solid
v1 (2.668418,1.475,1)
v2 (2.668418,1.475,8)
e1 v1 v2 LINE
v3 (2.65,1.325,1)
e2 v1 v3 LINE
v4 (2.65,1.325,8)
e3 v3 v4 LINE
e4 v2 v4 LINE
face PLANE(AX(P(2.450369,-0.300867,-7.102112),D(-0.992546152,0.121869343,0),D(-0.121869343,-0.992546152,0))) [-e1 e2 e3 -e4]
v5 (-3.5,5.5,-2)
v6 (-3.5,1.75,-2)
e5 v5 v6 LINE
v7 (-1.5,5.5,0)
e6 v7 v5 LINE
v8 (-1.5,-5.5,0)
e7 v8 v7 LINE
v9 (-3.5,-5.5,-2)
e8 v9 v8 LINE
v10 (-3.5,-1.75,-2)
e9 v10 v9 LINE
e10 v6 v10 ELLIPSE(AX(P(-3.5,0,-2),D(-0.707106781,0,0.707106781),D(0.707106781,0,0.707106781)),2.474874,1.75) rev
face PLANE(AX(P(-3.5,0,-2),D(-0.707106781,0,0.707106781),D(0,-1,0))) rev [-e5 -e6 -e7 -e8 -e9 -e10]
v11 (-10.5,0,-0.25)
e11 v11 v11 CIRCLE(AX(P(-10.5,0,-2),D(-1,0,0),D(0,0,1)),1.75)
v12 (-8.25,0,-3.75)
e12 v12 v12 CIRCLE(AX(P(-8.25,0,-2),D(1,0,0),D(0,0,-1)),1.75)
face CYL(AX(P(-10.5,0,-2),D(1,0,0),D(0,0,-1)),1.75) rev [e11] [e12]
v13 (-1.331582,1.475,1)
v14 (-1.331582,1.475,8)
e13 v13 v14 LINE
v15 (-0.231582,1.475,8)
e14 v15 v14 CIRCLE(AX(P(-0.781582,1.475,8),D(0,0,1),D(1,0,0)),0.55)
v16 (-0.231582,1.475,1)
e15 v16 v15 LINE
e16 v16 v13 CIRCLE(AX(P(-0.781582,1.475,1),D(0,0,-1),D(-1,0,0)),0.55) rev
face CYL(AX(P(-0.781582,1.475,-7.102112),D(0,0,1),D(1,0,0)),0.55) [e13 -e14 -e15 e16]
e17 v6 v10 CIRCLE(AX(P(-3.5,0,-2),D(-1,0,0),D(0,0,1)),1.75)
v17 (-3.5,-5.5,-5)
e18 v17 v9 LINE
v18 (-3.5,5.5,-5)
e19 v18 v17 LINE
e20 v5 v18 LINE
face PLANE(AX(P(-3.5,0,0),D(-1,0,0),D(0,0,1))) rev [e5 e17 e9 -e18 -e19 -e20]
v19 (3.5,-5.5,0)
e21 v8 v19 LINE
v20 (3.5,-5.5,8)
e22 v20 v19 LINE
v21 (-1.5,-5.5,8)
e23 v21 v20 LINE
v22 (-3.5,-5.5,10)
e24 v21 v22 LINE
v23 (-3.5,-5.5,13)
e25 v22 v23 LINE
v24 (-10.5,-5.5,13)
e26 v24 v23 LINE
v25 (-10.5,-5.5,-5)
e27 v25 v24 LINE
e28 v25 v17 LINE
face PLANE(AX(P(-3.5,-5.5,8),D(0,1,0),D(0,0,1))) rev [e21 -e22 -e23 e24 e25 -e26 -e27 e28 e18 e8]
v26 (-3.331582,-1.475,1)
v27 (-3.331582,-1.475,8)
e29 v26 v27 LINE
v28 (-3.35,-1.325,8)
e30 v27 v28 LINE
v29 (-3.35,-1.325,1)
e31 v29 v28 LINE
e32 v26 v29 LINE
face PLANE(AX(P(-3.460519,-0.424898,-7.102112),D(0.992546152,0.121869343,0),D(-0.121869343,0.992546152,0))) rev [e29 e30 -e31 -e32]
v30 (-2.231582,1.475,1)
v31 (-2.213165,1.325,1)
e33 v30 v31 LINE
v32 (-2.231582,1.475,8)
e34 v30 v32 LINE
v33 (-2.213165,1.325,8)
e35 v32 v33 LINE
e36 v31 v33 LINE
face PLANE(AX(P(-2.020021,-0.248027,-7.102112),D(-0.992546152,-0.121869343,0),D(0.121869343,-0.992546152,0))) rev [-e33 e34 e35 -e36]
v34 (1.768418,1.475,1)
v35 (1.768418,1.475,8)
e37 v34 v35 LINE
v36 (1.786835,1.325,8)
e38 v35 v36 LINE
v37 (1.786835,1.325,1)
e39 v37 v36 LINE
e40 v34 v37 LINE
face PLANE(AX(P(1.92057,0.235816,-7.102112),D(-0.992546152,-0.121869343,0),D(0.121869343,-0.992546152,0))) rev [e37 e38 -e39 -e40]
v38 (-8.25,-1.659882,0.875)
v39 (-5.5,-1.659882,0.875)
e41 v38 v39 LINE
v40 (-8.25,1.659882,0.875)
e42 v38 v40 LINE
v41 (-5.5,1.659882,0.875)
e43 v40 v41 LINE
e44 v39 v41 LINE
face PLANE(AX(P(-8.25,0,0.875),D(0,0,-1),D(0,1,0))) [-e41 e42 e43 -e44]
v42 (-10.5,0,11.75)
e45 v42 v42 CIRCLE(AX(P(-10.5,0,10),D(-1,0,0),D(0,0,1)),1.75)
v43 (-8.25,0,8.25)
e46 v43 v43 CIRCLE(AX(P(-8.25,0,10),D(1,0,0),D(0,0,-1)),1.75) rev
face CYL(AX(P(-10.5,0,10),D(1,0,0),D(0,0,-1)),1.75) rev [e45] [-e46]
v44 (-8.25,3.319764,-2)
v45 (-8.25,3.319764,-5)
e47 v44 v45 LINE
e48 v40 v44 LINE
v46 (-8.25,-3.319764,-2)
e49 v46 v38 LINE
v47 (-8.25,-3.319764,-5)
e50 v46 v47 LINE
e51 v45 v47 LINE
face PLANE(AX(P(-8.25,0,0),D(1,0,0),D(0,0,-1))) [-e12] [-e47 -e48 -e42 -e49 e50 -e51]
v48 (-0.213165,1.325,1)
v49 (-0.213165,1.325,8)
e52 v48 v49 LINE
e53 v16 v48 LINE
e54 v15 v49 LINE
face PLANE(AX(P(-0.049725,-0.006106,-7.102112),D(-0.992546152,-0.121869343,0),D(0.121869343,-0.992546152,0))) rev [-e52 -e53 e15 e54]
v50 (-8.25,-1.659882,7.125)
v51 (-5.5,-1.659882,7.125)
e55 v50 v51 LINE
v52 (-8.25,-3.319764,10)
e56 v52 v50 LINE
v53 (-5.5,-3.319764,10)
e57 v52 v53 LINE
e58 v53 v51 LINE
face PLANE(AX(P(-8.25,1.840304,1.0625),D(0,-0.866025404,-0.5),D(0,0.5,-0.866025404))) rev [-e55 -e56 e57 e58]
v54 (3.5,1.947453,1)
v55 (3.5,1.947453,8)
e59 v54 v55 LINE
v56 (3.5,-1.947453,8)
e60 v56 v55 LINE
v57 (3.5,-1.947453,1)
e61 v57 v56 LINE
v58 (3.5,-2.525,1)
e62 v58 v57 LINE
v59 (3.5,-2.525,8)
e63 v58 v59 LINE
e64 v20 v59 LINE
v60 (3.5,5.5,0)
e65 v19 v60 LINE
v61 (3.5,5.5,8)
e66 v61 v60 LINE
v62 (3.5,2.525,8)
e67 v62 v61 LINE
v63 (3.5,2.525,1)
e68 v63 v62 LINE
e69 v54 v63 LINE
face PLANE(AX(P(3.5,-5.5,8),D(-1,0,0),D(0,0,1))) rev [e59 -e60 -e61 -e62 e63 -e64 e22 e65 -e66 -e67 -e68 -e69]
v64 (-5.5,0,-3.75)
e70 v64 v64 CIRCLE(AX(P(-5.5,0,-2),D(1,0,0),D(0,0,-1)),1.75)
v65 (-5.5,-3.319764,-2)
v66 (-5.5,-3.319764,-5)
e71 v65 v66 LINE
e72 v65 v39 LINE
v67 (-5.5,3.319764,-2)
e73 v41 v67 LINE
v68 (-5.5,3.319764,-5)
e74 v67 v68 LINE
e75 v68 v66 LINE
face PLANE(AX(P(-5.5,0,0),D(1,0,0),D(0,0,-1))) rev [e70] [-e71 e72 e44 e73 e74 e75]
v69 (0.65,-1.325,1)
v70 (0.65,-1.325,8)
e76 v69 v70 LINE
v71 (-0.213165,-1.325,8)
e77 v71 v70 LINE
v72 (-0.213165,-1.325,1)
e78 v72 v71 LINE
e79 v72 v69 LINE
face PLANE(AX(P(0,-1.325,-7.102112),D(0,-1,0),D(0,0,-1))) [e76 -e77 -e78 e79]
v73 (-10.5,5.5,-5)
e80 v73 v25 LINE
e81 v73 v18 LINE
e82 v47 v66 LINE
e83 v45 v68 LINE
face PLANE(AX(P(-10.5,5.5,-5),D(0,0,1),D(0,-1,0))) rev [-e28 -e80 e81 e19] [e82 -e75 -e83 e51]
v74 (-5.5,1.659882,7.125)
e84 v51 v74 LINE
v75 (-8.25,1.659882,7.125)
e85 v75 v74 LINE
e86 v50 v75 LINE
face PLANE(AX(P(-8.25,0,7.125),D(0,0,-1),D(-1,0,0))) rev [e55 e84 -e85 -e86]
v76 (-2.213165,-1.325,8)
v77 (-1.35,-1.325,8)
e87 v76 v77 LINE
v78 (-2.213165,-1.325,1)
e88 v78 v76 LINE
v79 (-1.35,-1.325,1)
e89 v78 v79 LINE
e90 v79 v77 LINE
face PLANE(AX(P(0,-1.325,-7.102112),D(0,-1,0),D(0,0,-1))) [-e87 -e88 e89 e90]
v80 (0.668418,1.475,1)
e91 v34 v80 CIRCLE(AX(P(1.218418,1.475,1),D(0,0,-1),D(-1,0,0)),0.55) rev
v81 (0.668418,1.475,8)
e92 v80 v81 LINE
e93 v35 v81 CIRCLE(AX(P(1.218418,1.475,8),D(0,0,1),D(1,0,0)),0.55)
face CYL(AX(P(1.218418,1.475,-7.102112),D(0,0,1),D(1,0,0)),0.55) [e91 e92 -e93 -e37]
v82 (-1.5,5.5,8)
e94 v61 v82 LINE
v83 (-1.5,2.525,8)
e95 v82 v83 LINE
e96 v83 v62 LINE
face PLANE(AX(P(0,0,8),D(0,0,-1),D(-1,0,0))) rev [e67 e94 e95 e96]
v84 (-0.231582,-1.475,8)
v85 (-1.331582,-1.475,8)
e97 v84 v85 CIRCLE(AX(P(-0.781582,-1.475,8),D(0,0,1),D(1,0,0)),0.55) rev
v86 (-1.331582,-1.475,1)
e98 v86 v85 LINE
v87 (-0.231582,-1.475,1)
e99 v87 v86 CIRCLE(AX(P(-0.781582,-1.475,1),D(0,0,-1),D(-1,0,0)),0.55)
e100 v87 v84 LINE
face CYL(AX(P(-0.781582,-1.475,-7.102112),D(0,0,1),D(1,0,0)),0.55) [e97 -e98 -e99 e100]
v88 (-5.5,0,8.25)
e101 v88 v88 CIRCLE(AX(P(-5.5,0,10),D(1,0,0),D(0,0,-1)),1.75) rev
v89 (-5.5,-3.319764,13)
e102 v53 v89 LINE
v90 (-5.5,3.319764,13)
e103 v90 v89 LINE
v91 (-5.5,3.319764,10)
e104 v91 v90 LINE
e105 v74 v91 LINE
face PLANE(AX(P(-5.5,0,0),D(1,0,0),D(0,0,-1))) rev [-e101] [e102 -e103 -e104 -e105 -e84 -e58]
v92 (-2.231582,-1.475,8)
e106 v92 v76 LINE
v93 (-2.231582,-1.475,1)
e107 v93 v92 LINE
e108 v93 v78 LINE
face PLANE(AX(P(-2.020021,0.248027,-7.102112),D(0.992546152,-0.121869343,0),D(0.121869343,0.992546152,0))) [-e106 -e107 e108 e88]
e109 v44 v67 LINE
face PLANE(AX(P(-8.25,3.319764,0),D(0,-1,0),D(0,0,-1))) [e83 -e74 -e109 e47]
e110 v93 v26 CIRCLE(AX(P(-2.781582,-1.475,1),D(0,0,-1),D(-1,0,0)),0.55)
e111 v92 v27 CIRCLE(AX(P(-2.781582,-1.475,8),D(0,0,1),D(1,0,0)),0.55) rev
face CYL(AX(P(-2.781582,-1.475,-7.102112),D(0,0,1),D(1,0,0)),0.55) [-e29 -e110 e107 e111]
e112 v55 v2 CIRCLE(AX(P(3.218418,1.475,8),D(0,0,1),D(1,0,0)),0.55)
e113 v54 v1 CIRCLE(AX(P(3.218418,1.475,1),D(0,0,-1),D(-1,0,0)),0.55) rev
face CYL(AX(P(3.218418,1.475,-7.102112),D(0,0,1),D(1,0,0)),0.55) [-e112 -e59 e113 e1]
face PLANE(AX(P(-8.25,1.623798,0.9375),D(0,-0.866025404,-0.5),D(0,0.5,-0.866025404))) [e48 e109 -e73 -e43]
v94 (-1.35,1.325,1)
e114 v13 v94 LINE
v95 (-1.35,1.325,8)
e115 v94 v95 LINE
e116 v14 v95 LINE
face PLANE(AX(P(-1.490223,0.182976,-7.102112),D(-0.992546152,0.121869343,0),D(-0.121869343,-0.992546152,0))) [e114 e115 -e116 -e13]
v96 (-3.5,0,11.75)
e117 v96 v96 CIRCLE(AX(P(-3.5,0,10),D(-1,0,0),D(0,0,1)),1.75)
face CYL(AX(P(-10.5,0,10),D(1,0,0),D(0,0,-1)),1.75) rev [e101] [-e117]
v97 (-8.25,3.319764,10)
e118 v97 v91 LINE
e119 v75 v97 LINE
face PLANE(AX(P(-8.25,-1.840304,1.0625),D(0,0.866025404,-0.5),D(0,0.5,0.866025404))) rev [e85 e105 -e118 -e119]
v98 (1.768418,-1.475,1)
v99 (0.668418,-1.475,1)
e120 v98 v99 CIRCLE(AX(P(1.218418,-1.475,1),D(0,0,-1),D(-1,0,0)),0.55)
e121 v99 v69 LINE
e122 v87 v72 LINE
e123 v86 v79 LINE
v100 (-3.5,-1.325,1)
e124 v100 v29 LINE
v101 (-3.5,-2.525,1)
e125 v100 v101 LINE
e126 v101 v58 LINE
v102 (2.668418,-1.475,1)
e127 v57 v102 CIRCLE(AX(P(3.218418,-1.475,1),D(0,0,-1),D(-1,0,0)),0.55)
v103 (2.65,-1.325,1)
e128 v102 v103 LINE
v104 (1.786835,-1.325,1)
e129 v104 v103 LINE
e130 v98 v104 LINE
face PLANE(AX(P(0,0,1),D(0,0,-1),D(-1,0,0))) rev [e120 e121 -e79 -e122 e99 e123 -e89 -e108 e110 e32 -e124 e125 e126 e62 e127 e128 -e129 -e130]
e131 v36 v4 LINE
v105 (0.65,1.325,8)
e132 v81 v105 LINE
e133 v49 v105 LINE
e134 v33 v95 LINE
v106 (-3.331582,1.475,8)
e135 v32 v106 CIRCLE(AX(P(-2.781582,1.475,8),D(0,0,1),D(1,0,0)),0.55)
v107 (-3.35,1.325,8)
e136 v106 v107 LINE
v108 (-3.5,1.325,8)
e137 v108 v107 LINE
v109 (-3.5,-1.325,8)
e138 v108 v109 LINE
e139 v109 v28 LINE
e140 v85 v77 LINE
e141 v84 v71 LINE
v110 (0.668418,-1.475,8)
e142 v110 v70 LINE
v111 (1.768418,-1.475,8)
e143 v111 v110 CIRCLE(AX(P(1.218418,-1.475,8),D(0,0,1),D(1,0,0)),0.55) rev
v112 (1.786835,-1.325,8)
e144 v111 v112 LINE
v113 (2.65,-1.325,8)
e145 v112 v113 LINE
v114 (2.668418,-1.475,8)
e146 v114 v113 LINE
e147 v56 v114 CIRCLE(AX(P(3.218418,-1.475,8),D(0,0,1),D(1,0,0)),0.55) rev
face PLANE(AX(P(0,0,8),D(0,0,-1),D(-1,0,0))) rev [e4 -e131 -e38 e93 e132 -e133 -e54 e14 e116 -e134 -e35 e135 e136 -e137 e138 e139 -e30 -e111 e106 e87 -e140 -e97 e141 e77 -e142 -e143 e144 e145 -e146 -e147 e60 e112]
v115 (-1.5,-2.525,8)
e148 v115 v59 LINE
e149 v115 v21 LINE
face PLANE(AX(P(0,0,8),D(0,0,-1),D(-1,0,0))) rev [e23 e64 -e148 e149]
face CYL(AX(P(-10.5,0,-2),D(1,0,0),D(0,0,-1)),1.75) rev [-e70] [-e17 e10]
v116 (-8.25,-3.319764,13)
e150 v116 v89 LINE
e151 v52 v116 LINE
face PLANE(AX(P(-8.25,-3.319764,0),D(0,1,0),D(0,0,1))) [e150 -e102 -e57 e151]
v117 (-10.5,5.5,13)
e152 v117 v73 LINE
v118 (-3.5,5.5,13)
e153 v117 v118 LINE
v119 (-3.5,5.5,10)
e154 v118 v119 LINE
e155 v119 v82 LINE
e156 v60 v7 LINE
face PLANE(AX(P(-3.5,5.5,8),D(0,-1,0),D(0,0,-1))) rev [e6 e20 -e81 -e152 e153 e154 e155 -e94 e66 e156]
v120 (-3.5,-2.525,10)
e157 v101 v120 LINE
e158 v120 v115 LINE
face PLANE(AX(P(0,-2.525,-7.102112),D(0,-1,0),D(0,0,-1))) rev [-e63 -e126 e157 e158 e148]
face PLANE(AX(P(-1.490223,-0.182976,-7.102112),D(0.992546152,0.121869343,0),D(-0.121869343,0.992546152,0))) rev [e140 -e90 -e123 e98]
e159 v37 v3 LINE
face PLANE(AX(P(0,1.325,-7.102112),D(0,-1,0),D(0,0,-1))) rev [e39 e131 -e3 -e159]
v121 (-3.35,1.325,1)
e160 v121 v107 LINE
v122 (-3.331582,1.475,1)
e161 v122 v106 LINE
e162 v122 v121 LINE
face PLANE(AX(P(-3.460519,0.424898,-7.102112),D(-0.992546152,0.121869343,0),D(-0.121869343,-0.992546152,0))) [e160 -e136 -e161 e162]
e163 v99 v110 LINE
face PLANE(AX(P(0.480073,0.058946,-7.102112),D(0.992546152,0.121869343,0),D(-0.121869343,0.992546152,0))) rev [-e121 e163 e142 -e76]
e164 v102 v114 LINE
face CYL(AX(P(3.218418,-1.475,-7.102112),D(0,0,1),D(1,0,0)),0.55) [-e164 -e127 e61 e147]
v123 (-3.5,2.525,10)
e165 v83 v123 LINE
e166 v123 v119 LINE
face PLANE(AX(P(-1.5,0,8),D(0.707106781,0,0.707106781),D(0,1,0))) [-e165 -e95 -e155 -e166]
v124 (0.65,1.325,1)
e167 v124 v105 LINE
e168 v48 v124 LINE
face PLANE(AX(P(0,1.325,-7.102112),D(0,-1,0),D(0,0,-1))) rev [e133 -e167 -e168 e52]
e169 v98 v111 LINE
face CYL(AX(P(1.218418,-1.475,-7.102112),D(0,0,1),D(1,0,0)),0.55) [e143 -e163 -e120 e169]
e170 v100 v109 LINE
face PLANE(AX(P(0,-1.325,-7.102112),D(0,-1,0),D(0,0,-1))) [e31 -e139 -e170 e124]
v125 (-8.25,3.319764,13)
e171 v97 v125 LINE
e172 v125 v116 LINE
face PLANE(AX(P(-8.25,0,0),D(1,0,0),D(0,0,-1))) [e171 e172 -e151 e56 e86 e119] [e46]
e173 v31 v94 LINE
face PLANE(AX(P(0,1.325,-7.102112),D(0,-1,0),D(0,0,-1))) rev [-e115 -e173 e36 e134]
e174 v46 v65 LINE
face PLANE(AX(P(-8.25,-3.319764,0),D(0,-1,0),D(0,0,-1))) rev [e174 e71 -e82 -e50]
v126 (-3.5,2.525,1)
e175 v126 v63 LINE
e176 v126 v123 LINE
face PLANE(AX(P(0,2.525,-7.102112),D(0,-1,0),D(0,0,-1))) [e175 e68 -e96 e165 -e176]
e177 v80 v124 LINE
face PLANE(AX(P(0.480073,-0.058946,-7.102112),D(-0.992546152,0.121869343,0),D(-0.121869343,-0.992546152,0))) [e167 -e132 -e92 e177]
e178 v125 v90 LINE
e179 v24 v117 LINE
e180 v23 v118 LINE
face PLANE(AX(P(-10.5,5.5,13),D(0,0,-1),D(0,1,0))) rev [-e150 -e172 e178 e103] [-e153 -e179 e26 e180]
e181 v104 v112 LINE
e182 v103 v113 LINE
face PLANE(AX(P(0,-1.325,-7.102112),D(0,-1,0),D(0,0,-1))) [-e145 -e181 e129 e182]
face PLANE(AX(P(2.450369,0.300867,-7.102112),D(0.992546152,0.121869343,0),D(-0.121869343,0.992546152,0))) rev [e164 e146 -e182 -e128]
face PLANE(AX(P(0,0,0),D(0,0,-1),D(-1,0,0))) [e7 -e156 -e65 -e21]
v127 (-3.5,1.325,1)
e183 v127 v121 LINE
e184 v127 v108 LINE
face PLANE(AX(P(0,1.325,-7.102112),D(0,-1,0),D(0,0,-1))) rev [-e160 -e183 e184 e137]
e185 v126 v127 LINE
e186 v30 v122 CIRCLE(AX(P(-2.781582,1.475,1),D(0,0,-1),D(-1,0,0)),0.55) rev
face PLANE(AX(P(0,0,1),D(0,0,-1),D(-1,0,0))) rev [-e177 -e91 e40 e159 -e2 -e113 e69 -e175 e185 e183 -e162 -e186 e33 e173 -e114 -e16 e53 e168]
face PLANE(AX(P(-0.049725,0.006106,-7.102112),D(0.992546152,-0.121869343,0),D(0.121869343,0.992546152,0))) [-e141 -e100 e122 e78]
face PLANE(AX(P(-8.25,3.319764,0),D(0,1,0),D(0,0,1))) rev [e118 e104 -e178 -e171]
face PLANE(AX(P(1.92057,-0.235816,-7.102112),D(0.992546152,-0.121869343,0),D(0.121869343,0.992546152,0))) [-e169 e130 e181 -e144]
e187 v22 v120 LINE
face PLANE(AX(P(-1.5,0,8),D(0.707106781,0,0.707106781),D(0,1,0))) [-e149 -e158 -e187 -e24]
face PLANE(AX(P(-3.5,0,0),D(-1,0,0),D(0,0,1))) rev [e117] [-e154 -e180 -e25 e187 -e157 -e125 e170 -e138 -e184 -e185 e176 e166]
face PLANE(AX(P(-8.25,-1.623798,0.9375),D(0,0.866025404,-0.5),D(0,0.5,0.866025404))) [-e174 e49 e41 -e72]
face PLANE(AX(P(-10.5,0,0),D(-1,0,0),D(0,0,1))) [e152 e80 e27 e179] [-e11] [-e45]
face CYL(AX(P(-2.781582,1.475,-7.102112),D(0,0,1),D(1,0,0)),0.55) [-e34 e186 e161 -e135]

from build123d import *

# Parameters (mm, degrees)
SKETCH_1_W          = 7
SKETCH_1_H          = 11
EXTRUDE_1_DEPTH     = 8
CUT_EXTRUDE_1_DEPTH = 7
SKETCH_3_W          = 18
SKETCH_3_H          = 11
SKETCH_3_R          = 1.75
EXTRUDE_2_DEPTH     = 7
CUT_EXTRUDE_START   = -2
SKETCH_5_W          = 0.875
SKETCH_5_H          = 2.65
SKETCH_5_R          = 1.75
CUT_EXTRUDE_3_DEPTH = 2.75
CHAMFER_1_SIZE      = 2


with BuildPart() as part:
    # Эскиз1 → Бобышка-Вытянуть1 (new body)
    with BuildSketch(Plane.XY):
        Rectangle(SKETCH_1_W, SKETCH_1_H)
    extrude(amount=EXTRUDE_1_DEPTH)

    # Эскиз2 → Вырез-Вытянуть1 (cut)
    with BuildSketch(Plane.XY.offset(8)):
        with BuildLine():
            Line((-3.5, 2.525), (-3.5, 1.325))
            Line((-3.5, 1.325), (-3.35, 1.325))
            Line((-3.35, 1.325), (-3.331582316, 1.475))
            ThreePointArc((-3.331582316, 1.475), (-2.781582316, 2.025), (-2.231582316, 1.475))
            Line((-2.231582316, 1.475), (-2.213164632, 1.325))
            Line((-2.213164632, 1.325), (-1.35, 1.325))
            Line((-1.35, 1.325), (-1.331582316, 1.475))
            ThreePointArc((-1.331582316, 1.475), (-0.781582316, 2.025), (-0.231582316, 1.475))
            Line((-0.231582316, 1.475), (-0.213164632, 1.325))
            Line((-0.213164632, 1.325), (0.65, 1.325))
            Line((0.65, 1.325), (0.668417684, 1.475))
            ThreePointArc((0.668417684, 1.475), (1.218417684, 2.025), (1.768417684, 1.475))
            Line((1.768417684, 1.475), (1.786835368, 1.325))
            Line((1.786835368, 1.325), (2.65, 1.325))
            Line((2.65, 1.325), (2.668417684, 1.475))
            ThreePointArc((2.668417684, 1.475), (2.946728775, 1.953210348), (3.5, 1.947452537))
            Line((3.5, 1.947452537), (3.5, 2.525))
            Line((3.5, 2.525), (-3.5, 2.525))
        make_face()
        with BuildLine():
            Line((-3.35, -1.325), (-3.5, -1.325))
            Line((-3.5, -1.325), (-3.5, -2.525))
            Line((-3.5, -2.525), (3.5, -2.525))
            Line((3.5, -2.525), (3.5, -1.947452537))
            ThreePointArc((3.5, -1.947452537), (2.946728775, -1.953210348), (2.668417684, -1.475))
            Line((2.668417684, -1.475), (2.65, -1.325))
            Line((2.65, -1.325), (1.786835368, -1.325))
            Line((1.786835368, -1.325), (1.768417684, -1.475))
            ThreePointArc((1.768417684, -1.475), (1.218417684, -2.025), (0.668417684, -1.475))
            Line((0.668417684, -1.475), (0.65, -1.325))
            Line((0.65, -1.325), (-0.213164632, -1.325))
            Line((-0.213164632, -1.325), (-0.231582316, -1.475))
            ThreePointArc((-0.231582316, -1.475), (-0.781582316, -2.025), (-1.331582316, -1.475))
            Line((-1.331582316, -1.475), (-1.35, -1.325))
            Line((-1.35, -1.325), (-2.213164632, -1.325))
            Line((-2.213164632, -1.325), (-2.231582316, -1.475))
            ThreePointArc((-2.231582316, -1.475), (-2.781582316, -2.025), (-3.331582316, -1.475))
            Line((-3.331582316, -1.475), (-3.35, -1.325))
        make_face()
    extrude(amount=-CUT_EXTRUDE_1_DEPTH, mode=Mode.SUBTRACT)

    # Эскиз3 → Бобышка-Вытянуть2 (add)
    with BuildSketch(Plane.ZY.offset(3.5)):
        with Locations((4, 0)):
            Rectangle(SKETCH_3_W, SKETCH_3_H)
        with Locations((10, 0)):
            Circle(SKETCH_3_R, mode=Mode.SUBTRACT)
        with Locations((-2, 0)):
            Circle(SKETCH_3_R, mode=Mode.SUBTRACT)
    extrude(amount=EXTRUDE_2_DEPTH)

    # Эскиз5 → Вырез-Вытянуть3 (cut)
    # profile 1 of 5: a face of its own
    with BuildSketch(Plane(origin=(-3.5, 0, 0), x_dir=(0, 0, -1), z_dir=(1, 0, 0)).offset(CUT_EXTRUDE_START)):
        Polygon((2, 3.319764048), (4.875, 1.659882024), (4.875, -1.659882024), (2, -3.319764048), (-0.875, -1.659882024), (-0.875, 1.659882024), align=None)
    # profile 2 of 5: a face of its own
    with BuildSketch(Plane(origin=(-3.5, 0, 0), x_dir=(0, 0, -1), z_dir=(1, 0, 0)).offset(CUT_EXTRUDE_START)):
        Polygon((5, 3.319764048), (5, -3.319764048), (2, -3.319764048), (4.875, -1.659882024), (4.875, 1.659882024), (2, 3.319764048), align=None)
    # profile 3 of 5: a face of its own
    with BuildSketch(Plane(origin=(-3.5, 0, 0), x_dir=(0, 0, -1), z_dir=(1, 0, 0)).offset(CUT_EXTRUDE_START)):
        with Locations((-7.5625, 0)):
            Rectangle(SKETCH_5_W, SKETCH_5_H)
    # profile 4 of 5: a face of its own
    with BuildSketch(Plane(origin=(-3.5, 0, 0), x_dir=(0, 0, -1), z_dir=(1, 0, 0)).offset(CUT_EXTRUDE_START)):
        Polygon((-7.125, 1.659882024), (-10, 3.319764048), (-12.875, 1.659882024), (-12.875, -1.659882024), (-10, -3.319764048), (-7.125, -1.659882024), (-7.125, -1.325), (-8, -1.325), (-8, 1.325), (-7.125, 1.325), align=None)
        with Locations((-10, 0)):
            Circle(SKETCH_5_R, mode=Mode.SUBTRACT)
    # profile 5 of 5: a face of its own
    with BuildSketch(Plane(origin=(-3.5, 0, 0), x_dir=(0, 0, -1), z_dir=(1, 0, 0)).offset(CUT_EXTRUDE_START)):
        Polygon((-12.875, 1.659882024), (-10, 3.319764048), (-13, 3.319764048), (-13, -3.319764048), (-10, -3.319764048), (-12.875, -1.659882024), align=None)
    extrude(amount=-CUT_EXTRUDE_3_DEPTH, mode=Mode.SUBTRACT)

    # Фаска1
    # the kernel refuses this chamfer: 2 mm, written as the material it adds along each edge
    with BuildSketch(Plane(origin=(-3.5, 5.5, 8), x_dir=(1, 0, 0), z_dir=(0, -1, 0)), Plane(origin=(-3.5, -2.525, 8), x_dir=(1, 0, 0), z_dir=(0, -1, 0))) as chamfer_1_piece_1:
        Polygon((CHAMFER_1_SIZE, 0), (0, CHAMFER_1_SIZE), (0, 0), align=None)
    extrude(amount=2.975)
    with BuildSketch(Plane(origin=(-3.5, 10.643365976, 8), x_dir=(1, 0, 0), z_dir=(0, -1, 0))) as chamfer_1_piece_2_section:
        Polygon((CHAMFER_1_SIZE, 0), (0, CHAMFER_1_SIZE), (0, 0), align=None)
    chamfer_1_piece_2 = extrude(amount=13.261731952, mode=Mode.PRIVATE)
    chamfer_1_piece_2 = split(chamfer_1_piece_2, bisect_by=Plane(origin=(-3.5, -2.525, 8), z_dir=(0, -1, 0)), keep=Keep.TOP, mode=Mode.PRIVATE)
    add(chamfer_1_piece_2)
    with BuildSketch(Plane(origin=(-3.5, 2.618365976, 8), x_dir=(1, 0, 0), z_dir=(0, -1, 0))) as chamfer_1_piece_3_section:
        Polygon((CHAMFER_1_SIZE, 0), (0, CHAMFER_1_SIZE), (0, 0), align=None)
    chamfer_1_piece_3 = extrude(amount=13.261731952, mode=Mode.PRIVATE)
    chamfer_1_piece_3 = split(chamfer_1_piece_3, bisect_by=Plane(origin=(-3.5, 2.525, 8), z_dir=(0, 1, 0)), keep=Keep.TOP, mode=Mode.PRIVATE)
    add(chamfer_1_piece_3)
    with BuildSketch(Plane(origin=(-3.5, 5.5, 0), x_dir=(0, 0, -1), z_dir=(0, -1, 0))) as chamfer_1_piece_4_section:
        Polygon((CHAMFER_1_SIZE, 0), (0, CHAMFER_1_SIZE), (0, 0), align=None)
    chamfer_1_piece_4 = extrude(amount=11, mode=Mode.PRIVATE)
    chamfer_1_piece_4 = chamfer_1_piece_4 - Plane(origin=(-3.5, 0, -2), x_dir=(0, 0, 1), z_dir=(1, 0, 0)) * Cylinder(1.75, 30, mode=Mode.PRIVATE)
    add(chamfer_1_piece_4)


solid = part.part
